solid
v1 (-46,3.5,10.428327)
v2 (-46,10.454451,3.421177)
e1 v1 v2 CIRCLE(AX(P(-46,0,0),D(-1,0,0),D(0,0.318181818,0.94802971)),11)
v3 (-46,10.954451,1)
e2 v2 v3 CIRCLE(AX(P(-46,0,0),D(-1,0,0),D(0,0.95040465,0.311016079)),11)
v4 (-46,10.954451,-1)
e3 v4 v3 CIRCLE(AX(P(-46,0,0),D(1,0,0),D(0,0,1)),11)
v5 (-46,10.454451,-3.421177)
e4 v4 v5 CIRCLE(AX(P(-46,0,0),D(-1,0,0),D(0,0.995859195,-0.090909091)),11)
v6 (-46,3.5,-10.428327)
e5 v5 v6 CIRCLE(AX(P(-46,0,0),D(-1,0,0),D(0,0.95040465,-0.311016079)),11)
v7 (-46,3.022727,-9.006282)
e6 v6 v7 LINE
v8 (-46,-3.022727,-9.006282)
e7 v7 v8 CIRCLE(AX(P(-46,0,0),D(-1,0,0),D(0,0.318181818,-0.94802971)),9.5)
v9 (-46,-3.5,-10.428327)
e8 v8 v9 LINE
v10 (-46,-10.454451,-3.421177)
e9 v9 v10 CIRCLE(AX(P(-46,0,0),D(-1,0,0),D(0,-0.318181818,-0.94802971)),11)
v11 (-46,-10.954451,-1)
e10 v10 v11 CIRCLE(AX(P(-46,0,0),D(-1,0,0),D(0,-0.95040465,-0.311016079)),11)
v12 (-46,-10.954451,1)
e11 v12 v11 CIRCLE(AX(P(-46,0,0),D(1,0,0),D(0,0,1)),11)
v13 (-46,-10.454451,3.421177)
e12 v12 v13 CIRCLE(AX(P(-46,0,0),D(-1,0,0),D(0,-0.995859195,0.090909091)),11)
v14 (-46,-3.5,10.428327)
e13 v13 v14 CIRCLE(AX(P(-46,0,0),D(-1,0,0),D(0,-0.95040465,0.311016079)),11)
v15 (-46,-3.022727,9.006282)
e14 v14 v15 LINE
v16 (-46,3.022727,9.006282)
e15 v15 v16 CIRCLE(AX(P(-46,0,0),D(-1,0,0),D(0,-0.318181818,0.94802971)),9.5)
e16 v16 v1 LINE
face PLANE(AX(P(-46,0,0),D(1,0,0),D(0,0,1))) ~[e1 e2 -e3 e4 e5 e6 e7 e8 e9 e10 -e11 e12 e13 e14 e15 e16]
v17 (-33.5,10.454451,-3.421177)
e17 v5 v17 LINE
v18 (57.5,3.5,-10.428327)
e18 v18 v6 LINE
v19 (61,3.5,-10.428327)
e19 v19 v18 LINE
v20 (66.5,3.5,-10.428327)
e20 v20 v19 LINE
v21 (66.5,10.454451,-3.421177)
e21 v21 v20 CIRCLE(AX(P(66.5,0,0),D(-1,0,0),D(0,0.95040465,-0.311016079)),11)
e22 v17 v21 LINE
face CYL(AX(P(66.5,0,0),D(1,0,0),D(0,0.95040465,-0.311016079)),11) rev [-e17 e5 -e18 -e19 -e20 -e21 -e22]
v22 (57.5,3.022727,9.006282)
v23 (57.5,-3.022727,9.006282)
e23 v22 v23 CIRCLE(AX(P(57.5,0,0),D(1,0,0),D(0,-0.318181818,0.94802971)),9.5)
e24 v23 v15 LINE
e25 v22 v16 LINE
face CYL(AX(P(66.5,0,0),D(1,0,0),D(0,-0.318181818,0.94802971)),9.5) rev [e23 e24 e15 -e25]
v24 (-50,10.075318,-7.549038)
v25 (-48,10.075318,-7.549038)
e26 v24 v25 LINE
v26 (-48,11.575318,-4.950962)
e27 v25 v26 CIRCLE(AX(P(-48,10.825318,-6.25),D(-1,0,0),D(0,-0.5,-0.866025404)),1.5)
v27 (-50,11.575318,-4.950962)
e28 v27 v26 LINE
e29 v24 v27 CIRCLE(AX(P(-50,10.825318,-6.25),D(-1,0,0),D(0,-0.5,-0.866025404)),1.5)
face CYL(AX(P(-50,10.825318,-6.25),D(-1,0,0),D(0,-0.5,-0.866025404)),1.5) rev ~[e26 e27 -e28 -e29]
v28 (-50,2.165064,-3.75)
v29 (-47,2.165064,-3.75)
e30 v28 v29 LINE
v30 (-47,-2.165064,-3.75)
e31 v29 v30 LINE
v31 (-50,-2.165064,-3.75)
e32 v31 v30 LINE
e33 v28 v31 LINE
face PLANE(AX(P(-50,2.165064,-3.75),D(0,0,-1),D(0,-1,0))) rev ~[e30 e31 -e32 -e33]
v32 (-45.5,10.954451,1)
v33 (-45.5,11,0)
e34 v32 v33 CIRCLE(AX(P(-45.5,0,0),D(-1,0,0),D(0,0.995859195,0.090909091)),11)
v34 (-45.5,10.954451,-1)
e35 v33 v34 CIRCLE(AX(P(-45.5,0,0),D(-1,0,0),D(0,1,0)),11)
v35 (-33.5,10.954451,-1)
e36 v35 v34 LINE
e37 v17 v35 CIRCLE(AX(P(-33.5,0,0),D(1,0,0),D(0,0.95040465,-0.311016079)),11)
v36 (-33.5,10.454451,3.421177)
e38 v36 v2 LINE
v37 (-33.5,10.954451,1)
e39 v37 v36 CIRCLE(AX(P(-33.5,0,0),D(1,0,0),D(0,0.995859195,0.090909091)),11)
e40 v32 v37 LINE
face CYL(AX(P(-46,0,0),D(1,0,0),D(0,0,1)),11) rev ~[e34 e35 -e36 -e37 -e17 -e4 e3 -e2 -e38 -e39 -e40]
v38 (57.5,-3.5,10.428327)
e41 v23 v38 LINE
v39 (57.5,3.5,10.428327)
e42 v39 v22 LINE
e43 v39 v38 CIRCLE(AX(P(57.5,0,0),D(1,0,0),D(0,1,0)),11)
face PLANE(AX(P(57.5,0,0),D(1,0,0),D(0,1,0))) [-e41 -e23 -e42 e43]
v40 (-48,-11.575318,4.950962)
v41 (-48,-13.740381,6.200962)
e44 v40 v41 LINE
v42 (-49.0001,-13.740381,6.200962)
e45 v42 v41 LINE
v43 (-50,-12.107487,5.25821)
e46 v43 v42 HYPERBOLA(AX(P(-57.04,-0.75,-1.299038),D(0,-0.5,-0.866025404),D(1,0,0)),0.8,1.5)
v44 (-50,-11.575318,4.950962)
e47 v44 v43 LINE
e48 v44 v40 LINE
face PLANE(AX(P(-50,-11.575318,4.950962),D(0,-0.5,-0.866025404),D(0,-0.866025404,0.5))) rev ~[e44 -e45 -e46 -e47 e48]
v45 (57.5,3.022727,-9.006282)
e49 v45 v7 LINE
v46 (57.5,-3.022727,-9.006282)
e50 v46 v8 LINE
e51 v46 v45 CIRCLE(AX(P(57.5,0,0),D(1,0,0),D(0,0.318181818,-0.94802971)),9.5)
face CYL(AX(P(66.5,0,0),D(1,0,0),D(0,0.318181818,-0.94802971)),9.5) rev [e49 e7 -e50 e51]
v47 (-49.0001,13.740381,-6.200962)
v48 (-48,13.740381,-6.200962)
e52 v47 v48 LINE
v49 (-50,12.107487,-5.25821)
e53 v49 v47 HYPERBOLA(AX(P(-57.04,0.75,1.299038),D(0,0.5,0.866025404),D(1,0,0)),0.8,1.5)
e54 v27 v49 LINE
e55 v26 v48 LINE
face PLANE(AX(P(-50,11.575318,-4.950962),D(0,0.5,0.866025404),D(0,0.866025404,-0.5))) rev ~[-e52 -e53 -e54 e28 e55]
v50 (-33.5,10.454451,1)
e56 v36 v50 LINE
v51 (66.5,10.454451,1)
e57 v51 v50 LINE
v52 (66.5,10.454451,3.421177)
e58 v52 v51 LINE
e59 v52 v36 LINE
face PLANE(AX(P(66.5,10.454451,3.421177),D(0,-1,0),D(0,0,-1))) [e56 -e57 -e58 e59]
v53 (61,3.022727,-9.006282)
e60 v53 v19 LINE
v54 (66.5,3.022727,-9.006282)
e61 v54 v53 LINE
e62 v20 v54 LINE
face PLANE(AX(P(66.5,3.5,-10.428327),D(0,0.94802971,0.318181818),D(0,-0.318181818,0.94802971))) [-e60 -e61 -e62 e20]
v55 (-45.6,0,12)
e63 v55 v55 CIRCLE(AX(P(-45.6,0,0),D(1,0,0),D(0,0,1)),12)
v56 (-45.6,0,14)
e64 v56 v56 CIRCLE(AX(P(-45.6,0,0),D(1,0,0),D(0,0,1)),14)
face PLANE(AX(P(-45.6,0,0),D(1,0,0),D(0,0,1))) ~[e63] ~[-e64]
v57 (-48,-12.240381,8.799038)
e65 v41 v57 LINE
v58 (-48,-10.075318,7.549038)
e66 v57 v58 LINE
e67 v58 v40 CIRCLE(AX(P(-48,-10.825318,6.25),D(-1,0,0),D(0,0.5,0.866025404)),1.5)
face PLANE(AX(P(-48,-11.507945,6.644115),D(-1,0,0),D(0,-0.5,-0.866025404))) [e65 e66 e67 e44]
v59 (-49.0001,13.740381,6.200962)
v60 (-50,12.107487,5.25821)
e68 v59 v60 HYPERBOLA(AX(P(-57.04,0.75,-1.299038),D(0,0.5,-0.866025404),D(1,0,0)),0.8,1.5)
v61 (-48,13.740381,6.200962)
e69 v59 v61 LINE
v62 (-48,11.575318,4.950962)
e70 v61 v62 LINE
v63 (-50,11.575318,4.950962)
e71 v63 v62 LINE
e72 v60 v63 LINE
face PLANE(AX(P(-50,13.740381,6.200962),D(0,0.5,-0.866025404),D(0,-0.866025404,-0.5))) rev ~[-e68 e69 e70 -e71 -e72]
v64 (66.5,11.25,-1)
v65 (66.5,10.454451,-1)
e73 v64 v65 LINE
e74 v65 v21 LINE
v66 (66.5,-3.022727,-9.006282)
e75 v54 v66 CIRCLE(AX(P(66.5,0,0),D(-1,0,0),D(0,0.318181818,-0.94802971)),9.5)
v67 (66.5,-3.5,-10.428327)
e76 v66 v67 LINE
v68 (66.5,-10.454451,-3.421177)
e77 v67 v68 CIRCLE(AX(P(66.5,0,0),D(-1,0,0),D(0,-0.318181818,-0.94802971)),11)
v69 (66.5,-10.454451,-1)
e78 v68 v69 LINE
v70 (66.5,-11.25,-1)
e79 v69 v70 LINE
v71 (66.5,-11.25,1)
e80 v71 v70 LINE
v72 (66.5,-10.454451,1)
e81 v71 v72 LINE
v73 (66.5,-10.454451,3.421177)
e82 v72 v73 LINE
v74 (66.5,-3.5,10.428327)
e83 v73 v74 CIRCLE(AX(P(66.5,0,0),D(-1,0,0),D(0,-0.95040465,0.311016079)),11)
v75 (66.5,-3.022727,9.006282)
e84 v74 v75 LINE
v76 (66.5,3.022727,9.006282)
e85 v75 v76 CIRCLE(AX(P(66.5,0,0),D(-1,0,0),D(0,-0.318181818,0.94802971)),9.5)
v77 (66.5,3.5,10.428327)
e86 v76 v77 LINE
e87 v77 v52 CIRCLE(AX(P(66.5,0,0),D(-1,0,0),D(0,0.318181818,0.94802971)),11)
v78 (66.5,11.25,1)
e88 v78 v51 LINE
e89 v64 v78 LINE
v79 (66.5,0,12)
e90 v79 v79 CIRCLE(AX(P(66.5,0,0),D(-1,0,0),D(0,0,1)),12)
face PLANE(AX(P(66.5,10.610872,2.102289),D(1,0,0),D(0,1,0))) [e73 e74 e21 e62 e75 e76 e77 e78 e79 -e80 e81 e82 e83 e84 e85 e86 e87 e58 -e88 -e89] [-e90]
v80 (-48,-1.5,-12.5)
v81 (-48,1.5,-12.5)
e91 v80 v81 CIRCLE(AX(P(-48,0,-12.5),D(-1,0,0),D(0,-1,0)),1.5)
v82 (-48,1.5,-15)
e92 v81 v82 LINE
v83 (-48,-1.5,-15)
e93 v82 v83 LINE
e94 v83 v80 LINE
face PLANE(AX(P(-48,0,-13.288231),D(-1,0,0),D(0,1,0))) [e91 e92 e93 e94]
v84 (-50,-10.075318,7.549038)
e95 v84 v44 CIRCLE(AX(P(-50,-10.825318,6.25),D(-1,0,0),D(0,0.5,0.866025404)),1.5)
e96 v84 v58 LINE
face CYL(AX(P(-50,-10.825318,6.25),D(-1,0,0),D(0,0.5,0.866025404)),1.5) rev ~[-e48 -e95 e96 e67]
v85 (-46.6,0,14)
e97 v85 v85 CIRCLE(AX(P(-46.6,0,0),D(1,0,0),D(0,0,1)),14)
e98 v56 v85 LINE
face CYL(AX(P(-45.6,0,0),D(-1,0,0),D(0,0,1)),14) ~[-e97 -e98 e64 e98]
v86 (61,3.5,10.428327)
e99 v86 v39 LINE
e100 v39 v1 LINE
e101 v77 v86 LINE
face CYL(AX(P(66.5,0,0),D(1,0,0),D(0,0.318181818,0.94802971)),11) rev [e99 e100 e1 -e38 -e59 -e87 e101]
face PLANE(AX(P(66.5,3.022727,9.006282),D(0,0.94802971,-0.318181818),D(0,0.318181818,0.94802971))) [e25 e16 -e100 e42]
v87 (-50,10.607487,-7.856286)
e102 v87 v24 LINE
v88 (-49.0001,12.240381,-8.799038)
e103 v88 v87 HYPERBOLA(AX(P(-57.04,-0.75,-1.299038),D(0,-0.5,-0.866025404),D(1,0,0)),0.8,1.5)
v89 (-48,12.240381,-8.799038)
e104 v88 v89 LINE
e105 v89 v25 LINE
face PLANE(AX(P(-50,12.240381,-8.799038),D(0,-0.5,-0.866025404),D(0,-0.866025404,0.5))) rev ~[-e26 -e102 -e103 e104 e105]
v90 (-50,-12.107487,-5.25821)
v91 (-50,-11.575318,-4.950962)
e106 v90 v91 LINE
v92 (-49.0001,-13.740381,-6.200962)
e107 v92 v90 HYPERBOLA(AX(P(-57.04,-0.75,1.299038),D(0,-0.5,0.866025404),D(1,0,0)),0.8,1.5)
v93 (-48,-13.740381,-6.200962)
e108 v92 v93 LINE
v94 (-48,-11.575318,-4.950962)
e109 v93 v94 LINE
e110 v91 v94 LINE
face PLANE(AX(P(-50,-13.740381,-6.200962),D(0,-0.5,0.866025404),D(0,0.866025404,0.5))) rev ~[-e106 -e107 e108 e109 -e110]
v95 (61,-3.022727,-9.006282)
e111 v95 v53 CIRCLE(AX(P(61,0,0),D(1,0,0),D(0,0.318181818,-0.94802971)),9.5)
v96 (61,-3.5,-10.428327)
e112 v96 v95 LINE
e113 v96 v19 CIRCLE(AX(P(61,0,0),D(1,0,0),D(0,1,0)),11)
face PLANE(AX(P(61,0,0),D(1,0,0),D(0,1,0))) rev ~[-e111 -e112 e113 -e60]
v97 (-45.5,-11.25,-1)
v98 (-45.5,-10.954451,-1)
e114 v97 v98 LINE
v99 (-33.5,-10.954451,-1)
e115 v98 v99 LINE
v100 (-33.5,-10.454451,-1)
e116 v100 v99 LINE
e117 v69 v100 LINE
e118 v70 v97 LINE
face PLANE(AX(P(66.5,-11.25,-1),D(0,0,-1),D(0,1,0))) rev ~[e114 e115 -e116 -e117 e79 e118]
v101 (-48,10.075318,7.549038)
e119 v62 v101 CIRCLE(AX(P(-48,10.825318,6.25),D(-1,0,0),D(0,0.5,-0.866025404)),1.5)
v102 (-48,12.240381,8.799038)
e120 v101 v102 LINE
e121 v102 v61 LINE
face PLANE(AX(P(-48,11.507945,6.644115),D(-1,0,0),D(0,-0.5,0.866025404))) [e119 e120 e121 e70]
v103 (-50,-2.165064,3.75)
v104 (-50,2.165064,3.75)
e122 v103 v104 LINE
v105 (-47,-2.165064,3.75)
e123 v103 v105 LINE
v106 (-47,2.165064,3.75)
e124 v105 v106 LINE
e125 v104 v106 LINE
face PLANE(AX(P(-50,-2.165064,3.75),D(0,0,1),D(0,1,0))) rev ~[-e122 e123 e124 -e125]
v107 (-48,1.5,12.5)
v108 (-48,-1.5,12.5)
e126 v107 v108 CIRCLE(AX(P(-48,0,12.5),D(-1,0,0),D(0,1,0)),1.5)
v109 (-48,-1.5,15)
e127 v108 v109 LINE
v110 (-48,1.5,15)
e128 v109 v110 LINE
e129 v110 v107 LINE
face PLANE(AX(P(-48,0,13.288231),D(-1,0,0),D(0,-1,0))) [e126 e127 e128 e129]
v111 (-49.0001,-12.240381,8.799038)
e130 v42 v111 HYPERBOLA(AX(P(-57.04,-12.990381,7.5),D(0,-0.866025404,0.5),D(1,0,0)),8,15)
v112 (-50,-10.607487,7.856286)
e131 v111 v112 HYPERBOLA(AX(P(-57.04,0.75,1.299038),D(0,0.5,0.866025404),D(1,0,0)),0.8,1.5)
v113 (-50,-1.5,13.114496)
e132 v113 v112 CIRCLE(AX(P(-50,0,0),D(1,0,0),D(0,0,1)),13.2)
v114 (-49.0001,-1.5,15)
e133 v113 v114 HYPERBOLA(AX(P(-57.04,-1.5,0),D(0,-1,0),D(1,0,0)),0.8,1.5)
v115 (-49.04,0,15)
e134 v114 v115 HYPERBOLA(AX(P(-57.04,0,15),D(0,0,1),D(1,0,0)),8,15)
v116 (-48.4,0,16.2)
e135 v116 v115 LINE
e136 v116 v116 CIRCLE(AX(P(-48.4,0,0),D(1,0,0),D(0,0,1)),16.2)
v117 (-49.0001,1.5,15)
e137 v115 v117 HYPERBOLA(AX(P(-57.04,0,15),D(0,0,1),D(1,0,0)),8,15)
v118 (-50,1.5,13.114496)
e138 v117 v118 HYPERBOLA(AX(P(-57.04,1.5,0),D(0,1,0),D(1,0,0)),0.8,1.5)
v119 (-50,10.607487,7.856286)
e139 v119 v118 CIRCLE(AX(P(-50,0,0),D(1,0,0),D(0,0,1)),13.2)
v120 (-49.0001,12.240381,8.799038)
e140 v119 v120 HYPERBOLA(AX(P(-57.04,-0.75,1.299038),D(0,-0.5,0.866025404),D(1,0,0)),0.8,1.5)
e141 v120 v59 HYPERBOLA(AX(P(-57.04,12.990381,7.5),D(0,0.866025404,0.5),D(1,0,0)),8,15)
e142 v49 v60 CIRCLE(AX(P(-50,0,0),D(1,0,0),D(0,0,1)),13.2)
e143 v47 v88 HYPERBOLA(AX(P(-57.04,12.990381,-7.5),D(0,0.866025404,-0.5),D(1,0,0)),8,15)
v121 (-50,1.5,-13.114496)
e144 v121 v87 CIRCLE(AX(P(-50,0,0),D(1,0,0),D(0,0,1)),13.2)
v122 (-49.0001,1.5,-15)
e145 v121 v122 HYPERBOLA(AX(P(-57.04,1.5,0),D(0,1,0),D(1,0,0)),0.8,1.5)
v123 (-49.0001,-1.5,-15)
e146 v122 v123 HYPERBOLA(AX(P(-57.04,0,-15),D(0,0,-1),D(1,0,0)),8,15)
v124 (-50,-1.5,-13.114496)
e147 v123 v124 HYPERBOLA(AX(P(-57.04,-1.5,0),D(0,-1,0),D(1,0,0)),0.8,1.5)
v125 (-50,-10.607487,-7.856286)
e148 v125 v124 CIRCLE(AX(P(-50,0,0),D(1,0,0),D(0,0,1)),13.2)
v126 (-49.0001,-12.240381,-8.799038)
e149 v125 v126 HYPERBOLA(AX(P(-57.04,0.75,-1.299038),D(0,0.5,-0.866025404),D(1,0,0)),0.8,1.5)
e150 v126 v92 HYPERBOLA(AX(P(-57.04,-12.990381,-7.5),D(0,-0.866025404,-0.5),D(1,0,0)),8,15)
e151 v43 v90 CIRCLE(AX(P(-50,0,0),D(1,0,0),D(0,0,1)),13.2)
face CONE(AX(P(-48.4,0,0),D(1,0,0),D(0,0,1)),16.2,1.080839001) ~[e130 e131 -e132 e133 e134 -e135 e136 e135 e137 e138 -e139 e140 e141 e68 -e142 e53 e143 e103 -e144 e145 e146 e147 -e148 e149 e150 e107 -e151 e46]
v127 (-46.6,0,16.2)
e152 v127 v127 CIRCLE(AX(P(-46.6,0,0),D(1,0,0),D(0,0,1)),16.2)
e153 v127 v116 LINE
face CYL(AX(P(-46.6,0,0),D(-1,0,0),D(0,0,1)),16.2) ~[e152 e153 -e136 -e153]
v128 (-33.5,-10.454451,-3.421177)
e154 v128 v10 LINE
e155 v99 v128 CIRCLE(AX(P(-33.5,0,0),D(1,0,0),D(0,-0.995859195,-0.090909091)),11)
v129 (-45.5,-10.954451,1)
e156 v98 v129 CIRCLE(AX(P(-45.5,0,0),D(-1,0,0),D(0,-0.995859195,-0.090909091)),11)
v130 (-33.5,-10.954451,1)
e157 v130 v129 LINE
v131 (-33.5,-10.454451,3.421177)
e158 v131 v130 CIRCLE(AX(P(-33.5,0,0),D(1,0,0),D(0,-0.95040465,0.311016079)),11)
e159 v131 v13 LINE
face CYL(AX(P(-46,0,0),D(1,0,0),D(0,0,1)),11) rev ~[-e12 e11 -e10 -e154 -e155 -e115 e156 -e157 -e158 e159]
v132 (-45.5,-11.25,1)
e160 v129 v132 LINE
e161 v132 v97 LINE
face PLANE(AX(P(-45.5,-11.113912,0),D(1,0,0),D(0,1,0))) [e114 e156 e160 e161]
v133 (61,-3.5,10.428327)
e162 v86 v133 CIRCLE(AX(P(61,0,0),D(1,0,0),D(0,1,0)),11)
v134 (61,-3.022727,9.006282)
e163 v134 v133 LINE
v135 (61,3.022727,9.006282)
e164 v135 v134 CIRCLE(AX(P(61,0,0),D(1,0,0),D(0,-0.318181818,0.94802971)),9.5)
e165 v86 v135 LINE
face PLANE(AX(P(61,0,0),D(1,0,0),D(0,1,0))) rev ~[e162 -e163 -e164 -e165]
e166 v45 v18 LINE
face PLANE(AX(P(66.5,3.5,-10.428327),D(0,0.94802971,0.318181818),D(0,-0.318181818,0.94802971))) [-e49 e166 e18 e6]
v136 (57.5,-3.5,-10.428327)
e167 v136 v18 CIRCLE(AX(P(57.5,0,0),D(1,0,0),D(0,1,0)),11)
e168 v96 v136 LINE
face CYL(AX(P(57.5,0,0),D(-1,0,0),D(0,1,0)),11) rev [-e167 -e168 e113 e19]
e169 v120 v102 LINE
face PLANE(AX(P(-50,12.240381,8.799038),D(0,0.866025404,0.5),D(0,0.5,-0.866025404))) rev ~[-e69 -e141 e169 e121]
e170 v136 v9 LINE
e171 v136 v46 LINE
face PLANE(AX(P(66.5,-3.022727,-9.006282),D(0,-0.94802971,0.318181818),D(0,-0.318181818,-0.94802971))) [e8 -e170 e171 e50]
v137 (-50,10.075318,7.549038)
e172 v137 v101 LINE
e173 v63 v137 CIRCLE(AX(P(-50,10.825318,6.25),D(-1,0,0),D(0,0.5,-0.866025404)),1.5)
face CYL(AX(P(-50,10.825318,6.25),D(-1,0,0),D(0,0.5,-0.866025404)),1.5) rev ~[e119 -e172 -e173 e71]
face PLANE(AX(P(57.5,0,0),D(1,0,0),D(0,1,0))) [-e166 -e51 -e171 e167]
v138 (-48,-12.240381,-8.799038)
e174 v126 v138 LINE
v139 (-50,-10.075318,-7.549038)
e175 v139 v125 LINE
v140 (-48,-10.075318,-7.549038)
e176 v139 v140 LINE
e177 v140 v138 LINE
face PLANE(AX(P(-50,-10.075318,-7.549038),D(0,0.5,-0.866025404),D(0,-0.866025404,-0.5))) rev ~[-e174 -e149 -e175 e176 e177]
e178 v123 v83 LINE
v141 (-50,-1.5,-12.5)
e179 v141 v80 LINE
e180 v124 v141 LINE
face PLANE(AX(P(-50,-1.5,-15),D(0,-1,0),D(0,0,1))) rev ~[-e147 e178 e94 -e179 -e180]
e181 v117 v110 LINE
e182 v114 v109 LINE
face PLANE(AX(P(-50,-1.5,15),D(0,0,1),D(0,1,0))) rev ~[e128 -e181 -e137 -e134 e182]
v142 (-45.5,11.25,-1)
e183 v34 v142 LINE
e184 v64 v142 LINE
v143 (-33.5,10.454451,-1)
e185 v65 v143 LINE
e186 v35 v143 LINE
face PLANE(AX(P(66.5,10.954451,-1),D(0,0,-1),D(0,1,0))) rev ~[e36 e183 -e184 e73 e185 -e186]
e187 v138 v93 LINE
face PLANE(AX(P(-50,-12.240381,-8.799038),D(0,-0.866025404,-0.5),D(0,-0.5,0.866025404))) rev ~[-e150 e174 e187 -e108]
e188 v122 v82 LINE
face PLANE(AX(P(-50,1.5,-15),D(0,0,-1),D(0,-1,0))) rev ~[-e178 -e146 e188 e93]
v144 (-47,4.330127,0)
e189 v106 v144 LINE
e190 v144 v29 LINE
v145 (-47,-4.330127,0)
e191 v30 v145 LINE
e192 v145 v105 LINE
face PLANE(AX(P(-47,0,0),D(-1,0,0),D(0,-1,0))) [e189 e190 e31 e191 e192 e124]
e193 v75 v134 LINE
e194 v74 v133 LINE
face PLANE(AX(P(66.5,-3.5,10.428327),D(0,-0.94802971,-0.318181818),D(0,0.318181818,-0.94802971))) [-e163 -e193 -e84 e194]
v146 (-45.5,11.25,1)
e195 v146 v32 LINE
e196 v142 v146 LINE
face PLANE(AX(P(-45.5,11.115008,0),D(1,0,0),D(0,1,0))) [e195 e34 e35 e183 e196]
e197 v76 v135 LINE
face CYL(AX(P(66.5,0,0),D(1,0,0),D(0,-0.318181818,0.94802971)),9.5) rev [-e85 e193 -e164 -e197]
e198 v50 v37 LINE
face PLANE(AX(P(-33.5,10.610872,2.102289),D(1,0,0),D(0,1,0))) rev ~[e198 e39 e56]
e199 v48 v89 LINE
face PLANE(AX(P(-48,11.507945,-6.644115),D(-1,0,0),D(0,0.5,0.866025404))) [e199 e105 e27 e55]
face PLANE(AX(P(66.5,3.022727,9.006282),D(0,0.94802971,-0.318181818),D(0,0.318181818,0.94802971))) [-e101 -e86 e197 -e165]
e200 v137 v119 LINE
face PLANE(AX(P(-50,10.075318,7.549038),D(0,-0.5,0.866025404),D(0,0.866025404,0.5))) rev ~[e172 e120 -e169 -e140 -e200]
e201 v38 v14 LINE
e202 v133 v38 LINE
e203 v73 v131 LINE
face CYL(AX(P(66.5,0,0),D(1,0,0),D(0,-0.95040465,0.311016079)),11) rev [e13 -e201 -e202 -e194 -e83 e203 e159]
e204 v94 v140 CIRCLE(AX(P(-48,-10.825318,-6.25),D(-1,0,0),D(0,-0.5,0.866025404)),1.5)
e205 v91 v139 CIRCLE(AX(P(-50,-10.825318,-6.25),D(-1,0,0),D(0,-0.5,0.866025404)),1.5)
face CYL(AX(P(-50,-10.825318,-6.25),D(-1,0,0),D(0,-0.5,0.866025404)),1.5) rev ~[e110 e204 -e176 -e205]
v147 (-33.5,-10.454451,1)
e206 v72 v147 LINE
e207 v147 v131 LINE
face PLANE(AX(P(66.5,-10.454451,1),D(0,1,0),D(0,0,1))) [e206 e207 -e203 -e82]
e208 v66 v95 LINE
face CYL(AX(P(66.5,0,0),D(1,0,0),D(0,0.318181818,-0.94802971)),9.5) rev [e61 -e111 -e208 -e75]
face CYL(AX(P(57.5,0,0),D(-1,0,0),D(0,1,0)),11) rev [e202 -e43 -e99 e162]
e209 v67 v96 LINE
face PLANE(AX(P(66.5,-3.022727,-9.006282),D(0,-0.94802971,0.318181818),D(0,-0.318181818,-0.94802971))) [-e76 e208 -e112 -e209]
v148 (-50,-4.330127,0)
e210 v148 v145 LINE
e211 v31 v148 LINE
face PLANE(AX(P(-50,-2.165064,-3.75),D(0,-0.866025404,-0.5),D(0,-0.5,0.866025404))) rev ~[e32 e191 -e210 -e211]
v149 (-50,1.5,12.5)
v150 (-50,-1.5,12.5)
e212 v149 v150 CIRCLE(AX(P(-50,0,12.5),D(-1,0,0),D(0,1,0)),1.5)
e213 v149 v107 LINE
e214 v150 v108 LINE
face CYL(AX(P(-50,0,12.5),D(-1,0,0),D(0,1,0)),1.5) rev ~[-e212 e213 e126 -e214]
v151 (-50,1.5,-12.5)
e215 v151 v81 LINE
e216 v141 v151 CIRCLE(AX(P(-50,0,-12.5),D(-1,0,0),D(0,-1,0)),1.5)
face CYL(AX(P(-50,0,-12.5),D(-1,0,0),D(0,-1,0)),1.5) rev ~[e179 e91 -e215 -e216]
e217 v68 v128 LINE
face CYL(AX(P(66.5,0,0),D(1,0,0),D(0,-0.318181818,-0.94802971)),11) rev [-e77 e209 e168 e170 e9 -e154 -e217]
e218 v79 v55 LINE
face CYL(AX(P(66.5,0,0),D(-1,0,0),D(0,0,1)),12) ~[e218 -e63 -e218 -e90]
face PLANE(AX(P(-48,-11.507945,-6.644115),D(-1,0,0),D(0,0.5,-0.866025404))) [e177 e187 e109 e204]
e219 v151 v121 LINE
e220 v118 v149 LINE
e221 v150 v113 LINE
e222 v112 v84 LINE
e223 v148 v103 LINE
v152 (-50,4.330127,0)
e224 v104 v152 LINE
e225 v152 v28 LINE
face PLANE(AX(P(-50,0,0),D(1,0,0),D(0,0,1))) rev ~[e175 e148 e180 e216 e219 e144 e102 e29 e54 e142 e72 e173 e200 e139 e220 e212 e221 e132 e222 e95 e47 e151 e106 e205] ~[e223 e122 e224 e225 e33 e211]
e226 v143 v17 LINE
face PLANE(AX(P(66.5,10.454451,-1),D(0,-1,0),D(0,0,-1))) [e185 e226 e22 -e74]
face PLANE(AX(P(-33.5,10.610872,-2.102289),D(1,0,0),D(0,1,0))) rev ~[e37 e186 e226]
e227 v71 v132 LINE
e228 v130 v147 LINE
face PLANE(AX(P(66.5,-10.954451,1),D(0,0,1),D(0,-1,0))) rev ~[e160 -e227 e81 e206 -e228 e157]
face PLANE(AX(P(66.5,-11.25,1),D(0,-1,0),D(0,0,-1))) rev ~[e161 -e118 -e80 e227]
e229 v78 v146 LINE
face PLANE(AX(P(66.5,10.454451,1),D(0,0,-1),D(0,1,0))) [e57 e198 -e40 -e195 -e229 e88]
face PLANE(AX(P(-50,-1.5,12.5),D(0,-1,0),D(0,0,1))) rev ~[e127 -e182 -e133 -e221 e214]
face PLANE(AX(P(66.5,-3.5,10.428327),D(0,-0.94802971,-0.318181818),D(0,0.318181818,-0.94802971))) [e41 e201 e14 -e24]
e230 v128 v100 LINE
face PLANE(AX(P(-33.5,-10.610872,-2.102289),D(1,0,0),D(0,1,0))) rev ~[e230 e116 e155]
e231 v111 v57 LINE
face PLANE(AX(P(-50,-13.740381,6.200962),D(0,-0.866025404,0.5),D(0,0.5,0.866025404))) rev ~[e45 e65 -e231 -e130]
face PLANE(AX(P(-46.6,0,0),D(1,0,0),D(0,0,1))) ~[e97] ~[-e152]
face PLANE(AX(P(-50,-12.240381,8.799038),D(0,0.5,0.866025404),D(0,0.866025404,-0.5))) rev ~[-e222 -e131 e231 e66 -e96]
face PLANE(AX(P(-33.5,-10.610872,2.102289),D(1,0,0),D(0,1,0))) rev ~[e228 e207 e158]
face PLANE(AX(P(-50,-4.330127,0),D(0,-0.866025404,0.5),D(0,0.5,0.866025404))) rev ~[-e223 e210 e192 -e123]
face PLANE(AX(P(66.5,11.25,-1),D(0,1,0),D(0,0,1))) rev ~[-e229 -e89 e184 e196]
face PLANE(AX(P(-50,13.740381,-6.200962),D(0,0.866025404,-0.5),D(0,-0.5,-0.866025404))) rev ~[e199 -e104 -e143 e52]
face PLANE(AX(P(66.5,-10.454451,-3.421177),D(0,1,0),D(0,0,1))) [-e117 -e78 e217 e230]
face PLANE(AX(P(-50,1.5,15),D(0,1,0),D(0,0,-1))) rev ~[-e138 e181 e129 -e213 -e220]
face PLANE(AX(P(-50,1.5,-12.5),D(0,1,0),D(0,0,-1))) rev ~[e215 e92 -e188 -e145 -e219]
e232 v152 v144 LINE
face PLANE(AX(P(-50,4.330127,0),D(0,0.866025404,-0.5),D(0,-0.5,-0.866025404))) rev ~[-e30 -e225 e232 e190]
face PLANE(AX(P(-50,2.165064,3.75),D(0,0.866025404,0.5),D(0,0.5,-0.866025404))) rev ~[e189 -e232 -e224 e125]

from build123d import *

# Parameters (mm, degrees)
F3_DEPTH        = 112
F4_R            = 12
F5_DEPTH        = 112.5
F7_DEPTH        = 3
F9_DEPTH        = 2
F9_COPIES_COUNT = 6
F11_START       = 57.5
F10_R           = 11
F11_DEPTH       = 3.5
F12_DEPTH       = 100


# Not quite as in the source:
# - a pattern or mirror of a feature is missing from the dataset's text; its kind, count and spacing are read off the source's solid


with BuildPart() as f1:
    # F0 (on Front) → F1 (revolve)
    with BuildSketch(Plane.XZ):
        Polygon((-50, 13.2), (-50, 0), (-46, 0), (-46, 11), (66.5, 11), (66.5, 12), (-45.6, 12), (-45.6, 14), (-46.6, 14), (-46.6, 16.2), (-48.4, 16.2), align=None)
    revolve(axis=Axis((3.169978948, 0, 0), (1, 0, 0)))

    # F2 (on face) → F3 (cut)
    with BuildSketch(Plane.YZ.offset(66.5)):
        with BuildLine():
            ThreePointArc((-10.9544511501, -1), (-11, 0), (-10.9544511501, 1))
            Line((-10.9544511501, 1), (-11.25, 1))
            Line((-11.25, 1), (-11.25, -1))
            Line((-11.25, -1), (-10.9544511501, -1))
        make_face()
        with BuildLine():
            Line((11.25, 1), (10.9544511501, 1))
            ThreePointArc((10.9544511501, 1), (10.9886068874, 0.5005184057), (11, 0))
            ThreePointArc((11, 0), (10.9886068874, -0.5005184057), (10.9544511501, -1))
            Line((10.9544511501, -1), (11.25, -1))
            Line((11.25, -1), (11.25, 1))
        make_face()
    extrude(amount=-F3_DEPTH, mode=Mode.SUBTRACT)

    # F4 (on face) → F5 (join, through all)
    with BuildSketch(Plane.YZ.offset(66.5)):
        Circle(F4_R)
        with BuildLine():
            ThreePointArc((-10.4544511501, 3.4211768662), (-7.8074781011, 7.7487602686), (-3.5, 10.4283268073))
            ThreePointArc((-3.5, 10.4283268073), (0, 11), (3.5, 10.4283268073))
            ThreePointArc((3.5, 10.4283268073), (7.8074781011, 7.7487602686), (10.4544511501, 3.4211768662))
            ThreePointArc((10.4544511501, 3.4211768662), (10.7726876303, 2.2246800266), (10.9544511501, 1))
            Line((10.9544511501, 1), (11.25, 1))
            Line((11.25, 1), (11.25, -1))
            Line((11.25, -1), (10.9544511501, -1))
            ThreePointArc((10.9544511501, -1), (10.7726876303, -2.2246800266), (10.4544511501, -3.4211768662))
            ThreePointArc((10.4544511501, -3.4211768662), (7.8074781011, -7.7487602686), (3.5, -10.4283268073))
            ThreePointArc((3.5, -10.4283268073), (0, -11), (-3.5, -10.4283268073))
            ThreePointArc((-3.5, -10.4283268073), (-7.8074781011, -7.7487602686), (-10.4544511501, -3.4211768662))
            ThreePointArc((-10.4544511501, -3.4211768662), (-10.7726876303, -2.2246800266), (-10.9544511501, -1))
            Line((-10.9544511501, -1), (-11.25, -1))
            Line((-11.25, -1), (-11.25, 1))
            Line((-11.25, 1), (-10.9544511501, 1))
            ThreePointArc((-10.9544511501, 1), (-10.7726876303, 2.2246800266), (-10.4544511501, 3.4211768662))
        make_face(mode=Mode.SUBTRACT)
        with BuildLine():
            ThreePointArc((3.5, 10.4283268073), (0, 11), (-3.5, 10.4283268073))
            Line((-3.5, 10.4283268073), (-3.0227272727, 9.0062822427))
            ThreePointArc((-3.0227272727, 9.0062822427), (0, 9.5), (3.0227272727, 9.0062822427))
            Line((3.0227272727, 9.0062822427), (3.5, 10.4283268073))
        make_face()
        with BuildLine():
            Line((-3.0227272727, -9.0062822427), (-3.5, -10.4283268073))
            ThreePointArc((-3.5, -10.4283268073), (0, -11), (3.5, -10.4283268073))
            Line((3.5, -10.4283268073), (3.0227272727, -9.0062822427))
            ThreePointArc((3.0227272727, -9.0062822427), (0, -9.5), (-3.0227272727, -9.0062822427))
        make_face()
    extrude(amount=-F5_DEPTH)

    # F6 (on face) → F7 (cut)
    with BuildSketch(Plane(origin=(-50, 0, 0), x_dir=(0, -1, 0), z_dir=(-1, 0, 0))):
        Polygon((-4.3301270189, 0), (-2.1650635095, -3.75), (2.1650635095, -3.75), (4.3301270189, 0), (2.1650635095, 3.75), (-2.1650635095, 3.75), align=None)
    extrude(amount=-F7_DEPTH, mode=Mode.SUBTRACT)

    # F8 (on face) → F9 (cut)
    with BuildSketch(Plane(origin=(-50, 0, 0), x_dir=(0, -1, 0), z_dir=(-1, 0, 0))):
        with BuildLine():
            Line((1.5, 15), (-1.5, 15))
            Line((-1.5, 15), (-1.5, 12.5))
            ThreePointArc((-1.5, 12.5), (0, 11), (1.5, 12.5))
            Line((1.5, 12.5), (1.5, 15))
        make_face()
    f9 = extrude(amount=-F9_DEPTH, mode=Mode.SUBTRACT)

    # F9_copies: F9 ×6 about axis
    f9_copies_axis = Axis((0, 0, 0), (1, 0, 0))
    for i in range(1, F9_COPIES_COUNT):
        add(f9.rotate(f9_copies_axis, i * 360 / F9_COPIES_COUNT), mode=Mode.SUBTRACT)

    # F10 (on Right) → F11 (cut)
    with BuildSketch(Plane.YZ.offset(F11_START)):
        Circle(F10_R)
    extrude(amount=F11_DEPTH, mode=Mode.SUBTRACT)

    # F2 (on face) → F12 (join)
    with BuildSketch(Plane.YZ.offset(66.5)):
        with BuildLine():
            Line((10.4544511501, 1), (10.9544511501, 1))
            ThreePointArc((10.9544511501, 1), (10.7726876303, 2.2246800266), (10.4544511501, 3.4211768662))
            Line((10.4544511501, 3.4211768662), (10.4544511501, 1))
        make_face()
        with BuildLine():
            ThreePointArc((10.4544511501, -3.4211768662), (10.7726876303, -2.2246800266), (10.9544511501, -1))
            Line((10.9544511501, -1), (10.4544511501, -1))
            Line((10.4544511501, -1), (10.4544511501, -3.4211768662))
        make_face()
        with BuildLine():
            ThreePointArc((-10.9544511501, -1), (-10.7726876303, -2.2246800266), (-10.4544511501, -3.4211768662))
            Line((-10.4544511501, -3.4211768662), (-10.4544511501, -1))
            Line((-10.4544511501, -1), (-10.9544511501, -1))
        make_face()
        with BuildLine():
            Line((-10.4544511501, 1), (-10.4544511501, 3.4211768662))
            ThreePointArc((-10.4544511501, 3.4211768662), (-10.7726876303, 2.2246800266), (-10.9544511501, 1))
            Line((-10.9544511501, 1), (-10.4544511501, 1))
        make_face()
    extrude(amount=-F12_DEPTH)


solid = f1.part
